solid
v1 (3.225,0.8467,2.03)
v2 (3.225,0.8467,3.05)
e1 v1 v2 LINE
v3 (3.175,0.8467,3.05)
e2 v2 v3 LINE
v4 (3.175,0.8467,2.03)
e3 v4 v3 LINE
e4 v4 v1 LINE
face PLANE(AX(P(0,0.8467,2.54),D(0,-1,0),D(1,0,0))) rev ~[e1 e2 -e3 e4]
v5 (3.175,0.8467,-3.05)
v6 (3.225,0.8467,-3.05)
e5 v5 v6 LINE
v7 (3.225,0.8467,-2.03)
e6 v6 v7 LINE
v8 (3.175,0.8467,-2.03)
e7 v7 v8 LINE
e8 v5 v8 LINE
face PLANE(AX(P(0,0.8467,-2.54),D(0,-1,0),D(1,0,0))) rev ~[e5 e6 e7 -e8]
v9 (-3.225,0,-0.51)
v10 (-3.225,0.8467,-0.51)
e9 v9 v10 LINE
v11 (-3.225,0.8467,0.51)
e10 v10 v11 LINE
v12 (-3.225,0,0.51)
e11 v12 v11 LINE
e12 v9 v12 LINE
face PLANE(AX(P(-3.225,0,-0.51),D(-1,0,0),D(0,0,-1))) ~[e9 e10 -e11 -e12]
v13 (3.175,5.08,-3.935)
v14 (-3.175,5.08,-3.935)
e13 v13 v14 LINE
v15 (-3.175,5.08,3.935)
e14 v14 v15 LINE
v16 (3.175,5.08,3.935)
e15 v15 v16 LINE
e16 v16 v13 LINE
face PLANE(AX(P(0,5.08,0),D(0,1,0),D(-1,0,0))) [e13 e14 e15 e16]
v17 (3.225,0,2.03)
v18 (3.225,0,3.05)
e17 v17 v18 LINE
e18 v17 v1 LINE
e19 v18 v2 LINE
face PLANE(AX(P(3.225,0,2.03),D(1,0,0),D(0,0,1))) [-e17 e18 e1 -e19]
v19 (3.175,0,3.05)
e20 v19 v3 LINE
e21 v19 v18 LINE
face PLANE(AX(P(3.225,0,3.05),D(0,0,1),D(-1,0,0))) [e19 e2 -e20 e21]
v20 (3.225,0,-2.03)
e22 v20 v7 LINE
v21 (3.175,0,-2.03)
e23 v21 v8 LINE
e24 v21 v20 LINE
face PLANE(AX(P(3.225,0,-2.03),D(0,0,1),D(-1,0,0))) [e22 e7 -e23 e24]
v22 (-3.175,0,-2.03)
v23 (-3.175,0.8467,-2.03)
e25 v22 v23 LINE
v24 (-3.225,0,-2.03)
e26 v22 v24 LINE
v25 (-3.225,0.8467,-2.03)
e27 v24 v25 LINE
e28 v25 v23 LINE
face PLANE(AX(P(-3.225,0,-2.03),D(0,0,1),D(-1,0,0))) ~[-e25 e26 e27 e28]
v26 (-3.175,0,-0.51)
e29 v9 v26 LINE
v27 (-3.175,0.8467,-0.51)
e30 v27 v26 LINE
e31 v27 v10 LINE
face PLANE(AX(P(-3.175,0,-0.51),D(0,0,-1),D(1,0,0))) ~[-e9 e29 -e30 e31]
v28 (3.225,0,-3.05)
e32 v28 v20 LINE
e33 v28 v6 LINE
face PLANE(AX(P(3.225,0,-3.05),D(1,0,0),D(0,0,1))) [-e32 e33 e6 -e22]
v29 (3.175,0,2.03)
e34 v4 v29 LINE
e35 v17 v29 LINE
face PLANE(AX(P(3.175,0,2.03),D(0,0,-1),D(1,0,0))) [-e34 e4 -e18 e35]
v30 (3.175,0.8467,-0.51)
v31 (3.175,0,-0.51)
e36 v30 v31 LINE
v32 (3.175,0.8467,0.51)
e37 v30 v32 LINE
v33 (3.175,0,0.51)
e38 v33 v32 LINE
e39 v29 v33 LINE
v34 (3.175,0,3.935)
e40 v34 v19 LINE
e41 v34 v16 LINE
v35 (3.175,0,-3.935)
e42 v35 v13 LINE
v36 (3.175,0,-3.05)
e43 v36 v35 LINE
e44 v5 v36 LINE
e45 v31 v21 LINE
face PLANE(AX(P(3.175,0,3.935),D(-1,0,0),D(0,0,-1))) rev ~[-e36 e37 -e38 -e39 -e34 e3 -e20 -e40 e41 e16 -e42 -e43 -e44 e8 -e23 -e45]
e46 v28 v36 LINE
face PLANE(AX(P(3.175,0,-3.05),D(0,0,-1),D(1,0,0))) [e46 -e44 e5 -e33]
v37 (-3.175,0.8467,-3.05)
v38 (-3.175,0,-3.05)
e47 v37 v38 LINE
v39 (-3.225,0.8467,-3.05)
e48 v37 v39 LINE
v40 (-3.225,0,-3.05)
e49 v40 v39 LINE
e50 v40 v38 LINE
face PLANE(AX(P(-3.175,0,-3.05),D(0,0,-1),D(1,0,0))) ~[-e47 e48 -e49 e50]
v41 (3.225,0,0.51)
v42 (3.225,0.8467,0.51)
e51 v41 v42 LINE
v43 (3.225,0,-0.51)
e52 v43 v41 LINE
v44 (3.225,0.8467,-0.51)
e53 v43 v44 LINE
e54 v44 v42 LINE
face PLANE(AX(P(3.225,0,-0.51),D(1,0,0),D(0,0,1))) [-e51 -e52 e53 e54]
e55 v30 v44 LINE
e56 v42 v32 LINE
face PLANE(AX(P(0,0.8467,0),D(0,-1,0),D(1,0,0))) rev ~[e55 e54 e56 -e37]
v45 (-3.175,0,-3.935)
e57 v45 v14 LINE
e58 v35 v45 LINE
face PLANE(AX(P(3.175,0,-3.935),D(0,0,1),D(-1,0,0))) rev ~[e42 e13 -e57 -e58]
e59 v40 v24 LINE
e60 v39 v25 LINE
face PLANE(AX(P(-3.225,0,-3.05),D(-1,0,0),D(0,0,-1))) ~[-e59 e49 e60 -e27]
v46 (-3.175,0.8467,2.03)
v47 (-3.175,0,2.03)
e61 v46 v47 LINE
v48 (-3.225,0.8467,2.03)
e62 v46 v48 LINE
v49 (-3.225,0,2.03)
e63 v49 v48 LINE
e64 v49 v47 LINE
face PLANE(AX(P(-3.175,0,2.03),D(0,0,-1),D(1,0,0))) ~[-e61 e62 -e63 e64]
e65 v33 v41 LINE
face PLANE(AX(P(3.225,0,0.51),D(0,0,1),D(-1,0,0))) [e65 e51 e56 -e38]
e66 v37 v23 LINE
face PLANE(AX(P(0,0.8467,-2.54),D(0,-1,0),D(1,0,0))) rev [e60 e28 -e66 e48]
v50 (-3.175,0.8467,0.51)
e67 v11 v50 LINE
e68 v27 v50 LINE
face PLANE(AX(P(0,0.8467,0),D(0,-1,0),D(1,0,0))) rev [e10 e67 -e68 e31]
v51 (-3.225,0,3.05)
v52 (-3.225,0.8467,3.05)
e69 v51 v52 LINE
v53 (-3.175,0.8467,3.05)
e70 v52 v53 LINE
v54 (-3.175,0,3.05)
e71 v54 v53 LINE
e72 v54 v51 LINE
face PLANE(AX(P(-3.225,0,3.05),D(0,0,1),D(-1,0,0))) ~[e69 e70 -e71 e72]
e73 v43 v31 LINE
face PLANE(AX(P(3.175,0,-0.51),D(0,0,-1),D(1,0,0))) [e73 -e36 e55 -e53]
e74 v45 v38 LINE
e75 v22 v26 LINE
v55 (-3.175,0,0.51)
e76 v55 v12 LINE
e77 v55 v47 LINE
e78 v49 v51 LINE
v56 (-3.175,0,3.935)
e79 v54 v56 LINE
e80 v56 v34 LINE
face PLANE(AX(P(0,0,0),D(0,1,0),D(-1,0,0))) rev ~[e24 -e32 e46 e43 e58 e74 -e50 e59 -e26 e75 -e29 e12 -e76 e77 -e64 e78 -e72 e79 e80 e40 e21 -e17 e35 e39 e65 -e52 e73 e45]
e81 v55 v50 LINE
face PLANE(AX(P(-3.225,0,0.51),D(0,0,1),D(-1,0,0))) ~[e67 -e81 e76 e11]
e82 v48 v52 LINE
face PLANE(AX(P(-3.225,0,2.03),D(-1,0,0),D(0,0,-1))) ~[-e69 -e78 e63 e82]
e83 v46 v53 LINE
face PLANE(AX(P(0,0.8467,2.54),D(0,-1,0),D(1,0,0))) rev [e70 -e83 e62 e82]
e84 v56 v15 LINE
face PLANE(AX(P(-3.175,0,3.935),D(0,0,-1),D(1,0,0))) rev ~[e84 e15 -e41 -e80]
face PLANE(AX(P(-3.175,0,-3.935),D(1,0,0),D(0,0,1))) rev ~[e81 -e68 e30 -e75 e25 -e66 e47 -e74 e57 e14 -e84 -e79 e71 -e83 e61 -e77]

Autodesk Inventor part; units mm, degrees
ref_plane "YZ Plane" through (0, 0, 0) normal (1, 0, 0) x (0, 1, 0)
ref_plane "XZ Plane" through (0, 0, 0) normal (0, 1, 0) x (-1, 0, 0)
ref_plane "XY Plane" through (0, 0, 0) normal (0, 0, 1) x (1, 0, 0)
sketch "Sketch1" plane through (0, 0, 0) normal (0, 1, 0) x (-1, 0, 0)
  line L0 (3.175, 3.935) -> (-3.175, 3.935)
  line L1 (-3.175, 3.935) -> (-3.175, -3.935)
  line L2 (-3.175, -3.935) -> (3.175, -3.935)
  line L3 (3.175, -3.935) -> (3.175, 3.935)
  point P0 (0, 0)
  dimension "d0" = 6.35
  dimension "d1" = 3.175
  dimension "d2" = 7.87
  dimension "d3" = 3.935
extrude "Extrusion1" add sketch "Sketch1" along normal blind 5.08
sketch "Sketch2" plane through (0, 0, 0) normal (0, -1, 0) x (1, 0, 0)
  line L0 (3.225, 0.51) -> (1.955, 0.51)
  line L1 (1.955, 0.51) -> (1.955, -0.51)
  line L2 (1.955, -0.51) -> (3.225, -0.51)
  line L3 (3.225, -0.51) -> (3.225, 0.51)
  line L4 (3.175, 3.935) -> (3.175, -3.935) projected
  point P0 (0, 0)
  dimension "d6" = 1.02
  dimension "d7" = 0.51
  dimension "d8" = 0.05
  dimension "d9" = 1.27
extrude "Extrusion2" add sketch "Sketch2" against normal blind 0.8467
pattern_linear "Rectangular Pattern1" count 3 spacing 2.54 along (0, 0, -1) of "Extrusion2" first direction both ways yes
mirror "Mirror1" about plane through (0, 0, 0) normal (1, 0, 0) of "Extrusion2", "Rectangular Pattern1"
properties part number "MC_TT240"
